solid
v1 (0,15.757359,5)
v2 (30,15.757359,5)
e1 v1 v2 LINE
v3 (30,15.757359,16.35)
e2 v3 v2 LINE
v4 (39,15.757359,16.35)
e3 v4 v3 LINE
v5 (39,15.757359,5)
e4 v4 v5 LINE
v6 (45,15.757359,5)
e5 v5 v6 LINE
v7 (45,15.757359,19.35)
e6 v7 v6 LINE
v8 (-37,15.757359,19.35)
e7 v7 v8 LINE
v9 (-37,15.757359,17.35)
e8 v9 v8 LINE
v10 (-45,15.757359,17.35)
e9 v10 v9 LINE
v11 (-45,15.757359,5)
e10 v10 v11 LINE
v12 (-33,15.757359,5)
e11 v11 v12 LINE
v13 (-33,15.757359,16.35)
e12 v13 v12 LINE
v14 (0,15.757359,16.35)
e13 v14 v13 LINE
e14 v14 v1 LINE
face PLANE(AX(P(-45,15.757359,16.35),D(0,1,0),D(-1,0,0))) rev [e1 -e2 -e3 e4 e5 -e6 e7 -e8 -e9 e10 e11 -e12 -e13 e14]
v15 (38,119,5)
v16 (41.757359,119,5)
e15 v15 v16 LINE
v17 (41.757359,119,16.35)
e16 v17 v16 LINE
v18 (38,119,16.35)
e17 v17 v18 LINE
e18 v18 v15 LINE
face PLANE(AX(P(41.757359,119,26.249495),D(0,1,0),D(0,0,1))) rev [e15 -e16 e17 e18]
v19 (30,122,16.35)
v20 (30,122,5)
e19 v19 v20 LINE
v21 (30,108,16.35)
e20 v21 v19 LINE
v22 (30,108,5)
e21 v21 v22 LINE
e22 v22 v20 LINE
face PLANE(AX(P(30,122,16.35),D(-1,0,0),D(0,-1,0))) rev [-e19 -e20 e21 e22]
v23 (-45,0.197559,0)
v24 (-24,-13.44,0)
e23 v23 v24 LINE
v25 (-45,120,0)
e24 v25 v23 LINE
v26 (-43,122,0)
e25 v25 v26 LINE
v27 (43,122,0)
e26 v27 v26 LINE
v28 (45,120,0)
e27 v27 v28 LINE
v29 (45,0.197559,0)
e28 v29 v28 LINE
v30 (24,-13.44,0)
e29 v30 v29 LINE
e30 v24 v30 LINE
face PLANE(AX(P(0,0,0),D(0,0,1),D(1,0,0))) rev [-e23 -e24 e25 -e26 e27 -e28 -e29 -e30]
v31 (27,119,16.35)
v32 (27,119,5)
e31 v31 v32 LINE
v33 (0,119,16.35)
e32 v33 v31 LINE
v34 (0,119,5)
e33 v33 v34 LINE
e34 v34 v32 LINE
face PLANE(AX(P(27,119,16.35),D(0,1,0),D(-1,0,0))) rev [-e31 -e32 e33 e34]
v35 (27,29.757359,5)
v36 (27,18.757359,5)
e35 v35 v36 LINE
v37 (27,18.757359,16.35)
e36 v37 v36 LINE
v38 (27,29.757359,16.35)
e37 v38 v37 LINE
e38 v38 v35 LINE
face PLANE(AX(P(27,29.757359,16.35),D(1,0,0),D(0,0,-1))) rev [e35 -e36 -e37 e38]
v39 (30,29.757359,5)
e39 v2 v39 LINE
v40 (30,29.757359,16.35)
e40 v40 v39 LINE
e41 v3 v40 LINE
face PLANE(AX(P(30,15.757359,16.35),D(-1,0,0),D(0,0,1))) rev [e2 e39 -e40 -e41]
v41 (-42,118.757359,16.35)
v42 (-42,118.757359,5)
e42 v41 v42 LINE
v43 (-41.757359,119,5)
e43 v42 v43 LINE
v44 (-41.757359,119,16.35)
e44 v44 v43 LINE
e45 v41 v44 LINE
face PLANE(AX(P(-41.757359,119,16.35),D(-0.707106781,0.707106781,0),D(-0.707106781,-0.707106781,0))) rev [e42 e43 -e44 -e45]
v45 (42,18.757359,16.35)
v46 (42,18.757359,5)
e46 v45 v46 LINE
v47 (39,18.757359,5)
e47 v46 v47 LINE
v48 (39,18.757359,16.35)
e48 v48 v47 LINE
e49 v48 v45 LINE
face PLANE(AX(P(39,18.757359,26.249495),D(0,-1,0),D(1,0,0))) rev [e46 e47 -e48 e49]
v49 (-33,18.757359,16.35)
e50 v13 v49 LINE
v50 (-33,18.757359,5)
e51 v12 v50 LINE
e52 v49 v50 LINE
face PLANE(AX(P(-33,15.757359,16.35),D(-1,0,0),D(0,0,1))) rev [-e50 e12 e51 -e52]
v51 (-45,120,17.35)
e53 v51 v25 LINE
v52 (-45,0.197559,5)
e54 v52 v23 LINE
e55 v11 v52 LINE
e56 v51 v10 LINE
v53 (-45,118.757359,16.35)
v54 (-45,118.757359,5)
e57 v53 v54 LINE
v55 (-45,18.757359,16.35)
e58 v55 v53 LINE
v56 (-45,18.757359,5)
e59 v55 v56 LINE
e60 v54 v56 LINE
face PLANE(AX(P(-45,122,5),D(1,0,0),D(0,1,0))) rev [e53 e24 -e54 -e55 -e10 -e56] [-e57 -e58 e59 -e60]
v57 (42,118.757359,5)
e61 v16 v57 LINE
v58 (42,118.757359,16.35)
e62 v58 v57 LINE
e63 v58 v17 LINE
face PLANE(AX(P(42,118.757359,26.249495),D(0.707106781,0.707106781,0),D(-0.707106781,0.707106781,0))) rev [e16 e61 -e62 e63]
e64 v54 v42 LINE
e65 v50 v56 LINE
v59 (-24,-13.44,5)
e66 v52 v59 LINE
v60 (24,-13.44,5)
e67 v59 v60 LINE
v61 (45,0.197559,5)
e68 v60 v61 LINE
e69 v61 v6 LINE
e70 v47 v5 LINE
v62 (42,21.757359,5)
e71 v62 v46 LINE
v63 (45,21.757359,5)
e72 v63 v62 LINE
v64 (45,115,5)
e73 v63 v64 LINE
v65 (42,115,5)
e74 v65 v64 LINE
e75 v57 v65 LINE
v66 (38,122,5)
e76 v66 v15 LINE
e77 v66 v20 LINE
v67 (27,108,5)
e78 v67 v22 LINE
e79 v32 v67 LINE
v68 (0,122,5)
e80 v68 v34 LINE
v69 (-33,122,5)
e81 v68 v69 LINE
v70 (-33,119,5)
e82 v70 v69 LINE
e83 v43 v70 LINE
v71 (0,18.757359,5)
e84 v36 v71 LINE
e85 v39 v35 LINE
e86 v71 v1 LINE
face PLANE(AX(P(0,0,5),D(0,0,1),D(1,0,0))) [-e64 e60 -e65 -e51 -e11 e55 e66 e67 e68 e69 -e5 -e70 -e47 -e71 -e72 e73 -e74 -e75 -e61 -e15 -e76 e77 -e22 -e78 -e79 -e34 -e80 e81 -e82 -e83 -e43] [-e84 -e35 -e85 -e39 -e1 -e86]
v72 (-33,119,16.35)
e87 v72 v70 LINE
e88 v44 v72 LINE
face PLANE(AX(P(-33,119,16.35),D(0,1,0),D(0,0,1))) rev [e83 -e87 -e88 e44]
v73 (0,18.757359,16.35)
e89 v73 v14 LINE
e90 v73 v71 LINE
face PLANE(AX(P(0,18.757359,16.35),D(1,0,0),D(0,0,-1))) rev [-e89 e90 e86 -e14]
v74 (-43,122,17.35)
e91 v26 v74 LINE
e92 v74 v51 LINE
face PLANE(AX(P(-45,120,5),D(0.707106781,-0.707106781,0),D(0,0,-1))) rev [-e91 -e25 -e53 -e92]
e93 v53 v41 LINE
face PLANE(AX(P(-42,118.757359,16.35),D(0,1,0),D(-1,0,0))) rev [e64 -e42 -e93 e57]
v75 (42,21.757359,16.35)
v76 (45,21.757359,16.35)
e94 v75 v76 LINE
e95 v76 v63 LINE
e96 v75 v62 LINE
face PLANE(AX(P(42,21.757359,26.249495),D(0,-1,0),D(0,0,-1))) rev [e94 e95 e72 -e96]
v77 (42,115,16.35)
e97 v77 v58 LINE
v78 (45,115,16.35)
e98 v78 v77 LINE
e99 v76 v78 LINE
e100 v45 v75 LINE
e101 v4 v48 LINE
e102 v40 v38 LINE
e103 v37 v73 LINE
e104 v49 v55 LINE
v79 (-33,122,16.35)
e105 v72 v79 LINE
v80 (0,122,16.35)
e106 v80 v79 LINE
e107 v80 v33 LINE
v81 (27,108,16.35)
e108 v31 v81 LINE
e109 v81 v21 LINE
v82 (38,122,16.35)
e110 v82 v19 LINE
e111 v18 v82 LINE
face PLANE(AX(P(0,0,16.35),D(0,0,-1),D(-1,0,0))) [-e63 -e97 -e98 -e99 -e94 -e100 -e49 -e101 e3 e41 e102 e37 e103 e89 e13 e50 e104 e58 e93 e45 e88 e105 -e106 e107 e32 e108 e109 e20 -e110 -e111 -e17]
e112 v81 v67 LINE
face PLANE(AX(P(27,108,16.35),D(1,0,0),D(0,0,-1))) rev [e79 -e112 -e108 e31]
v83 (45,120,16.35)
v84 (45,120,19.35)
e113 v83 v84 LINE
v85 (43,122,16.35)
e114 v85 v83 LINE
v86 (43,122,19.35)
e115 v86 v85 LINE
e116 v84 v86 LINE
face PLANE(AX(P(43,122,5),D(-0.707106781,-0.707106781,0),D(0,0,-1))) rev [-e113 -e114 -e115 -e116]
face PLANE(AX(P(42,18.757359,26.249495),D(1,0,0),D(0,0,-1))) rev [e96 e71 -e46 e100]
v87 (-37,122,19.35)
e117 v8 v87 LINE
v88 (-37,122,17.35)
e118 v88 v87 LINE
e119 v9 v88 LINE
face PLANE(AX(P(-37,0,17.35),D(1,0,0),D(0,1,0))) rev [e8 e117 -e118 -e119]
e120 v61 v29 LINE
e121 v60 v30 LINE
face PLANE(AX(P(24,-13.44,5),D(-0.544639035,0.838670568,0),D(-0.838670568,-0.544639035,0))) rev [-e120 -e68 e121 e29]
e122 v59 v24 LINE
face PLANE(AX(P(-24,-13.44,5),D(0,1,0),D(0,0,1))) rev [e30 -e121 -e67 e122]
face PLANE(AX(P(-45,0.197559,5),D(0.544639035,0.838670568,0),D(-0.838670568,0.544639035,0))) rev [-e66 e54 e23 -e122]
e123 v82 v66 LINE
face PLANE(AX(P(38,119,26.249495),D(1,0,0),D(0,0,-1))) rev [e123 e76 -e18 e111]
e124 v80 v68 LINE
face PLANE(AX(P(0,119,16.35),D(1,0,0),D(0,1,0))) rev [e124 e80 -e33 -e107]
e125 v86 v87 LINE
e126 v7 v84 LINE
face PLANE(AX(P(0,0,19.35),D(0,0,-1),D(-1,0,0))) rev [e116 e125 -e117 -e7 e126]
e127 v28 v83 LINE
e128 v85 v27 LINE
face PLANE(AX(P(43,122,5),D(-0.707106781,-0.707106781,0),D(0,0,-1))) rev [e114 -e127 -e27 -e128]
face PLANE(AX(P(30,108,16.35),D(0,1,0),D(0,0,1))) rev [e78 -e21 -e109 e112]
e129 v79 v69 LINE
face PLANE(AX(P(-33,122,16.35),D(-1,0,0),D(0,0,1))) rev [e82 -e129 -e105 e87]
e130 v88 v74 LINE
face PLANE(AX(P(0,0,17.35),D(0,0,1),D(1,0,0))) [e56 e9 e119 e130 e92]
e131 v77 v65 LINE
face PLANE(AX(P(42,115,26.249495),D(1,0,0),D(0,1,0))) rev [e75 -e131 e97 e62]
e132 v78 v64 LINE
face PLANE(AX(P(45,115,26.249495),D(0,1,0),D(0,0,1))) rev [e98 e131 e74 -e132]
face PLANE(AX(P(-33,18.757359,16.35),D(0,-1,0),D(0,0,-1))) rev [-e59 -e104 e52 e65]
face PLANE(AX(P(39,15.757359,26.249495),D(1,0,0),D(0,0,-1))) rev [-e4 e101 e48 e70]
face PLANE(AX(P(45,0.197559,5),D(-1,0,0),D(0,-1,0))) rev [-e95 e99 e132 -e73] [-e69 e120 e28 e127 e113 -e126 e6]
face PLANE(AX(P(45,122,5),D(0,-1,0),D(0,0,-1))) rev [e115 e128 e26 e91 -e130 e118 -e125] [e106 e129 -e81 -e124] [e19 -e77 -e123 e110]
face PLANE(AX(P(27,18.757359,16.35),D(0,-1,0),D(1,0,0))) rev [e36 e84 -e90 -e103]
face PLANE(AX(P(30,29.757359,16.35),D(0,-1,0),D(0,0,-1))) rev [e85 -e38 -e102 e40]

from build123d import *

# Parameters (mm, degrees)
BOSS_EXTRUDE1_DEPTH = 5
CHAMFER1_SIZE       = 2
SKETCH4_W           = 12
SKETCH4_H           = 3
BOSS_EXTRUDE2_DEPTH = 11.35
BOSS_EXTRUDE3_DEPTH = 3
BOSS_EXTRUDE4_DEPTH = 11.35
CHAMFER2_START      = 116.672618896
CHAMFER2_OUTLINE_W  = 5
CHAMFER2_OUTLINE_H  = 4.65
CHAMFER2_DEPTH      = 2.327381104
CUT_EXTRUDE2_DEPTH  = 2


with BuildPart() as part:
    # Sketch2 → Boss-Extrude1 (new body)
    with BuildSketch(Plane.XY):
        Polygon((-45, 122), (-45, 0.197559457), (-24, -13.44), (24, -13.44), (45, 0.197559457), (45, 122), align=None)
    extrude(amount=BOSS_EXTRUDE1_DEPTH)

    # Chamfer1
    chamfer1_edges = [part.edges().sort_by_distance(p)[0] for p in [
        (45, 122, 2.5),
        (-45, 122, 2.5),
    ]]
    chamfer(chamfer1_edges, length=CHAMFER1_SIZE)

    # Sketch4 → Boss-Extrude2 (add)
    with BuildSketch(Plane.XY.offset(5)):
        Polygon((-45, 120), (-43, 122), (-33, 122), (-33, 119), (-41.757359313, 119), (-42, 118.757359313), (-45, 118.757359313), align=None)
        with Locations((-39, 17.257359313)):
            Rectangle(SKETCH4_W, SKETCH4_H)
        Polygon((0, 122), (30, 122), (30, 108), (27, 108), (27, 119), (0, 119), align=None)
        Polygon((0, 15.757359313), (30, 15.757359313), (30, 29.757359313), (27, 29.757359313), (27, 18.757359313), (0, 18.757359313), align=None)
    extrude(amount=BOSS_EXTRUDE2_DEPTH)

    # Sketch5 → Boss-Extrude3 (add)
    with BuildSketch(Plane.XY.offset(16.35)):
        Polygon((45, 15.757359313), (-45, 15.757359313), (-45, 120), (-43, 122), (45, 122), align=None)
    extrude(amount=BOSS_EXTRUDE3_DEPTH)

    # Sketch6 → Boss-Extrude4 (add)
    with BuildSketch(Plane.XY.offset(5)):
        Polygon((38, 122), (43, 122), (45, 120), (45, 115), (42, 115), (42, 118.757359313), (41.757359313, 119), (38, 119), align=None)
        Polygon((45, 15.757359313), (39, 15.757359313), (39, 18.757359313), (42, 18.757359313), (42, 21.757359313), (45, 21.757359313), align=None)
    extrude(amount=BOSS_EXTRUDE4_DEPTH)

    # Chamfer2: read off the stored shape, not the designer's step
    # Chamfer2 outline → Chamfer2 (cut)
    with BuildSketch(Plane(origin=(0, 0, 0), x_dir=(0.70710678118655, -0.707106781186545, 0), z_dir=(0.707106781186545, 0.70710678118655, 0)).offset(CHAMFER2_START)):
        with Locations((-54.5, -18.675)):
            Rectangle(CHAMFER2_OUTLINE_W, CHAMFER2_OUTLINE_H)
    extrude(amount=CHAMFER2_DEPTH, mode=Mode.SUBTRACT)

    # Sketch8 → Cut-Extrude2 (cut)
    with BuildSketch(Plane.XY.offset(19.35)):
        Polygon((-45, 15.757359313), (-37, 15.757359313), (-37, 122), (-43, 122), (-45, 120), align=None)
    extrude(amount=-CUT_EXTRUDE2_DEPTH, mode=Mode.SUBTRACT)


solid = part.part
